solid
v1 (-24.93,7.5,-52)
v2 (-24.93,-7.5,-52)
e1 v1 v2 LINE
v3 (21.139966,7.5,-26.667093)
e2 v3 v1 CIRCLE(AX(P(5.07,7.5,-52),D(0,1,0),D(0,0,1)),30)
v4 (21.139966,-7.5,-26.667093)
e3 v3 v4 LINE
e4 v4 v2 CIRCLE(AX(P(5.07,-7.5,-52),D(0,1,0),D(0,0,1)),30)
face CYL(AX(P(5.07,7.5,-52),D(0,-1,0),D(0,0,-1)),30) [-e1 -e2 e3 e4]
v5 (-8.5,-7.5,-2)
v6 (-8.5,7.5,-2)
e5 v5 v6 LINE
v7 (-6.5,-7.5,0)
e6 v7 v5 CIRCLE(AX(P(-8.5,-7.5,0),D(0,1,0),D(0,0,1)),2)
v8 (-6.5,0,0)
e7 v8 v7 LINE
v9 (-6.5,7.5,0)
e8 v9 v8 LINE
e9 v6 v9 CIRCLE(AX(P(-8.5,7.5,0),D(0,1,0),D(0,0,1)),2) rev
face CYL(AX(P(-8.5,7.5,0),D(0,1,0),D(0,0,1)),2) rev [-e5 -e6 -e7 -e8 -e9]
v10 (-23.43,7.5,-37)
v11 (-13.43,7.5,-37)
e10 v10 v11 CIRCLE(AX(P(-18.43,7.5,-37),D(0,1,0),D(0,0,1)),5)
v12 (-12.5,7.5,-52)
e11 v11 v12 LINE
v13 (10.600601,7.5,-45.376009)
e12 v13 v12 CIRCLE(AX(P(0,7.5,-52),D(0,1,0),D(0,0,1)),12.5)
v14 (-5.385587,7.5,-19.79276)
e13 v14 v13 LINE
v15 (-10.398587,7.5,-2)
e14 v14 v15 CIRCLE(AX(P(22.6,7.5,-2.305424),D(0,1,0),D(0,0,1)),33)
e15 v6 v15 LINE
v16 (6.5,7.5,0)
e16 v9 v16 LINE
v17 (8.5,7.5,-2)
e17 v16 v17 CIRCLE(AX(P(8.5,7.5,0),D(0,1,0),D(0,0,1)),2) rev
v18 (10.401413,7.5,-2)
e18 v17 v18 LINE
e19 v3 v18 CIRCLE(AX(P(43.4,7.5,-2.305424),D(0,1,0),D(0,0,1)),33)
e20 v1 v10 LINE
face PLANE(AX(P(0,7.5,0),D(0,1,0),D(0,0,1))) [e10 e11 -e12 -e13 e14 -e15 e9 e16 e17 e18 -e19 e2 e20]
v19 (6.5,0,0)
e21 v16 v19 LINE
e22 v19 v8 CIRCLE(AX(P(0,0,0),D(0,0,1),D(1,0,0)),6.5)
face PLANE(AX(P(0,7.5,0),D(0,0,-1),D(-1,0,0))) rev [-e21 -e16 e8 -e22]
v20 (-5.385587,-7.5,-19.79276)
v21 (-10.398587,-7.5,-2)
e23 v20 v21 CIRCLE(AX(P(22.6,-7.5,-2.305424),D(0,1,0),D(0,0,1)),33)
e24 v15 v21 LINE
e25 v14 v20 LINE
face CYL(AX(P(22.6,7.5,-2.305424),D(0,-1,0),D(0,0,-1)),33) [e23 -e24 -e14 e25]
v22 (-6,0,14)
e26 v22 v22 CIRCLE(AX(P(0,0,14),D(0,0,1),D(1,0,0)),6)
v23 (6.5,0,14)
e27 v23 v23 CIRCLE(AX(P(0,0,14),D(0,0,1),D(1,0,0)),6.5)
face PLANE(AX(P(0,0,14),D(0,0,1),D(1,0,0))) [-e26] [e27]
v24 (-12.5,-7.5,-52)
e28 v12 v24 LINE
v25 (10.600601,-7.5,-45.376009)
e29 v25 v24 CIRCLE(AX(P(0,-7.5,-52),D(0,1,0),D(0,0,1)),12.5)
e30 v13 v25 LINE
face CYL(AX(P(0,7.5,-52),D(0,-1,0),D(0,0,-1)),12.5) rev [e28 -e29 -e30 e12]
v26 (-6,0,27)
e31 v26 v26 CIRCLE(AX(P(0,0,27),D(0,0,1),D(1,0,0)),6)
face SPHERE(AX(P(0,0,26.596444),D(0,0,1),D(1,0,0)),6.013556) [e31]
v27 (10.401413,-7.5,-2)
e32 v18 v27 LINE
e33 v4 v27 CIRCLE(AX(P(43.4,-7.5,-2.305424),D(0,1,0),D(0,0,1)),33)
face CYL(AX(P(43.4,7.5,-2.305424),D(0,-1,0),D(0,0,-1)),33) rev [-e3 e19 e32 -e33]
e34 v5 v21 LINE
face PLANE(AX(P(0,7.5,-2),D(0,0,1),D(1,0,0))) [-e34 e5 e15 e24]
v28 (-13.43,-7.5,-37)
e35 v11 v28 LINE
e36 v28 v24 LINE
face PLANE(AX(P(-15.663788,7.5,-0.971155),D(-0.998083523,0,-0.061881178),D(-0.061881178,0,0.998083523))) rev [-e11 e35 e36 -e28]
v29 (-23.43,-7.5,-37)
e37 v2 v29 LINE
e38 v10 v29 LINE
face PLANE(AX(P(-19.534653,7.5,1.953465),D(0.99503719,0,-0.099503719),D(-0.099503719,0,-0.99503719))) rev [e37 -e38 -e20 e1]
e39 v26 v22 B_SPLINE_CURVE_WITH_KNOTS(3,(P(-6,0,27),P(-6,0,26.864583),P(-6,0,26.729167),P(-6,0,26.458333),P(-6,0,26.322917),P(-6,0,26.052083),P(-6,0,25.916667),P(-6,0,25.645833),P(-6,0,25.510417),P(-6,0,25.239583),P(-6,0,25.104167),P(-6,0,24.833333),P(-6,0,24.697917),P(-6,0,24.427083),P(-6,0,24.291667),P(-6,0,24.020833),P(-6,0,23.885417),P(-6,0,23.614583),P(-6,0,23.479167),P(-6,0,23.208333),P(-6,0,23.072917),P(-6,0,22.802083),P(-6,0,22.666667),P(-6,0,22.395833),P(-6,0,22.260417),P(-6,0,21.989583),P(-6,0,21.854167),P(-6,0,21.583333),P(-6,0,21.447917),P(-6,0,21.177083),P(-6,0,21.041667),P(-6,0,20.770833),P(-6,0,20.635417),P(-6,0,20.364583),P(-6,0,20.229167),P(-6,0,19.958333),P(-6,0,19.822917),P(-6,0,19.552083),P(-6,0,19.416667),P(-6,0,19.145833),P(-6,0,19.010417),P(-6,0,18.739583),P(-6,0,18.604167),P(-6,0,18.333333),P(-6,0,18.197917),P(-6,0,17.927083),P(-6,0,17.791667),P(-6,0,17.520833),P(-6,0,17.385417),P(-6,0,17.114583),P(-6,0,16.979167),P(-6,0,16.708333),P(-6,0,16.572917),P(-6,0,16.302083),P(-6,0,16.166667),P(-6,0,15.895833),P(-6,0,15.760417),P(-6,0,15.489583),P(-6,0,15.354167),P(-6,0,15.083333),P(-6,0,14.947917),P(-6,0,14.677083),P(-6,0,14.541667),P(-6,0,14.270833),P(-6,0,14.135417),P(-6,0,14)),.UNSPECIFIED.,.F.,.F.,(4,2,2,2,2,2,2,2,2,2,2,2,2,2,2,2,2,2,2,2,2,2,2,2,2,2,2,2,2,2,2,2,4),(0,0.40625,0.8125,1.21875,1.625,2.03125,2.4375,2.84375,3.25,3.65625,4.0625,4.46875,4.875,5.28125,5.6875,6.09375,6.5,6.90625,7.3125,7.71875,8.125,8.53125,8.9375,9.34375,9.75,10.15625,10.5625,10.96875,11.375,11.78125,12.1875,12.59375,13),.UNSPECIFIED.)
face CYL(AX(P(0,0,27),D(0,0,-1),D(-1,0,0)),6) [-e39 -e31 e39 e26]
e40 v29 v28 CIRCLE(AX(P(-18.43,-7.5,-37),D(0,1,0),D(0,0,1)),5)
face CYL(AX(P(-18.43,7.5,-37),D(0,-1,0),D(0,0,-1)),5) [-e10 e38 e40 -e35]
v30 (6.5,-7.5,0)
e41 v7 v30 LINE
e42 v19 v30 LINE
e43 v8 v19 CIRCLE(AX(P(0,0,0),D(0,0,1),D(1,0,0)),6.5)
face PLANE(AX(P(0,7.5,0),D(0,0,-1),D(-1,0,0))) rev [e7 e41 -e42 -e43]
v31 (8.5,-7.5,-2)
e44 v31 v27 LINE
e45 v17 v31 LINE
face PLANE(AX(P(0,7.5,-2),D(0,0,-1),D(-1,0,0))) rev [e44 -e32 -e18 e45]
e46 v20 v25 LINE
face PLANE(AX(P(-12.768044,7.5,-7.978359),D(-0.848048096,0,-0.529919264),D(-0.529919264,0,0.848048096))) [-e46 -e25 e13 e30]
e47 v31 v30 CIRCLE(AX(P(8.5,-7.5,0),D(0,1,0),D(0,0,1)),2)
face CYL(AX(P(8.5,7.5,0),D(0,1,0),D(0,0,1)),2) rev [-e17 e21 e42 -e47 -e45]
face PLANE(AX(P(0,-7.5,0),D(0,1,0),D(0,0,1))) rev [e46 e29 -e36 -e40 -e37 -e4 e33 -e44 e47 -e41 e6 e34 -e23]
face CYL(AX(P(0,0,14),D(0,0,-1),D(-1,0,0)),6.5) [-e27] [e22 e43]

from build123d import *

# Parameters (mm, degrees)
SCHIZZO1_R                   = 6.5
ESTRUSIONE_ESTRUSIONE1_DEPTH = 14
SCHIZZO2_R                   = 6
ESTRUSIONE_ESTRUSIONE2_DEPTH = 13
CUPOLA1_FACE_RADIUS          = 6
CUPOLA1_HEIGHT               = 5.61
ESTRUSIONE_ESTRUSIONE3_DEPTH = 7.5
RACCORDO1_R                  = 2


with BuildPart() as part:
    # Schizzo1 → Estrusione-Estrusione1 (new body)
    with BuildSketch(Plane.XY):
        Circle(SCHIZZO1_R)
    extrude(amount=ESTRUSIONE_ESTRUSIONE1_DEPTH)

    # Schizzo2 → Estrusione-Estrusione2 (add)
    with BuildSketch(Plane.XY.offset(14)):
        with Locations(Location((0, 0, 0), (0, 0, 180))):
            Circle(SCHIZZO2_R)
    extrude(amount=ESTRUSIONE_ESTRUSIONE2_DEPTH)

    # Cupola1: a dome of height H over a round flat face of radius A is a cap of a sphere of radius (A * A + H * H) / (2 * H)
    cupola1_r = (CUPOLA1_FACE_RADIUS * CUPOLA1_FACE_RADIUS + CUPOLA1_HEIGHT * CUPOLA1_HEIGHT) / (2 * CUPOLA1_HEIGHT)
    cupola1_base = Plane((0, 0, 27), z_dir=(0, 0, 1))
    with Locations(cupola1_base.offset(CUPOLA1_HEIGHT - cupola1_r)):
        cupola1_ball = Sphere(cupola1_r, mode=Mode.PRIVATE)
    add(split(cupola1_ball, bisect_by=cupola1_base, keep=Keep.TOP, mode=Mode.PRIVATE))

    # Schizzo3 → Estrusione-Estrusione3 (add, symmetric)
    with BuildSketch(Plane(origin=(0, 0, 0), x_dir=(1, 0, 0), z_dir=(0, 1, 0))):
        with BuildLine():
            Line((-6.5, 2), (-6.5, 0))
            Line((-6.5, 0), (0, 0))
            Line((0, 0), (0, 28.411501065))
            Line((0, 28.411501065), (-5.385587173, 19.792759953))
            ThreePointArc((-5.385587173, 19.792759953), (-9.163389911, 11.254561696), (-10.398586576, 2))
            Line((-10.398586576, 2), (-6.5, 2))
        make_face()
        with BuildLine():
            Line((0, 28.411501065), (0, 0))
            Line((0, 0), (6.5, 0))
            Line((6.5, 0), (6.5, 2))
            Line((6.5, 2), (10.401413424, 2))
            ThreePointArc((10.401413424, 2), (13.142849654, 15.477548319), (21.139966273, 26.667092863))
            ThreePointArc((21.139966273, 26.667092863), (19.525120405, 78.287820261), (-24.93, 52))
            Line((-24.93, 52), (-24.335940594, 46.059405941))
            Line((-24.335940594, 46.059405941), (-23.43, 37))
            ThreePointArc((-23.43, 37), (-18.43, 32), (-13.43, 37))
            Line((-13.43, 37), (-12.5, 52))
            ThreePointArc((-12.5, 52), (3.445466948, 64.015771199), (10.600601202, 45.376009197))
            Line((10.600601202, 45.376009197), (0, 28.411501065))
        make_face()
    extrude(amount=ESTRUSIONE_ESTRUSIONE3_DEPTH, both=True)

    # Raccordo1
    raccordo1_edges = [part.edges().sort_by_distance(p)[0] for p in [
        (6.5, 0, -2),
        (-6.5, 0, -2),
    ]]
    fillet(raccordo1_edges, radius=RACCORDO1_R - 0.0001)  # a hair under: the kernel refuses the full size


solid = part.part
